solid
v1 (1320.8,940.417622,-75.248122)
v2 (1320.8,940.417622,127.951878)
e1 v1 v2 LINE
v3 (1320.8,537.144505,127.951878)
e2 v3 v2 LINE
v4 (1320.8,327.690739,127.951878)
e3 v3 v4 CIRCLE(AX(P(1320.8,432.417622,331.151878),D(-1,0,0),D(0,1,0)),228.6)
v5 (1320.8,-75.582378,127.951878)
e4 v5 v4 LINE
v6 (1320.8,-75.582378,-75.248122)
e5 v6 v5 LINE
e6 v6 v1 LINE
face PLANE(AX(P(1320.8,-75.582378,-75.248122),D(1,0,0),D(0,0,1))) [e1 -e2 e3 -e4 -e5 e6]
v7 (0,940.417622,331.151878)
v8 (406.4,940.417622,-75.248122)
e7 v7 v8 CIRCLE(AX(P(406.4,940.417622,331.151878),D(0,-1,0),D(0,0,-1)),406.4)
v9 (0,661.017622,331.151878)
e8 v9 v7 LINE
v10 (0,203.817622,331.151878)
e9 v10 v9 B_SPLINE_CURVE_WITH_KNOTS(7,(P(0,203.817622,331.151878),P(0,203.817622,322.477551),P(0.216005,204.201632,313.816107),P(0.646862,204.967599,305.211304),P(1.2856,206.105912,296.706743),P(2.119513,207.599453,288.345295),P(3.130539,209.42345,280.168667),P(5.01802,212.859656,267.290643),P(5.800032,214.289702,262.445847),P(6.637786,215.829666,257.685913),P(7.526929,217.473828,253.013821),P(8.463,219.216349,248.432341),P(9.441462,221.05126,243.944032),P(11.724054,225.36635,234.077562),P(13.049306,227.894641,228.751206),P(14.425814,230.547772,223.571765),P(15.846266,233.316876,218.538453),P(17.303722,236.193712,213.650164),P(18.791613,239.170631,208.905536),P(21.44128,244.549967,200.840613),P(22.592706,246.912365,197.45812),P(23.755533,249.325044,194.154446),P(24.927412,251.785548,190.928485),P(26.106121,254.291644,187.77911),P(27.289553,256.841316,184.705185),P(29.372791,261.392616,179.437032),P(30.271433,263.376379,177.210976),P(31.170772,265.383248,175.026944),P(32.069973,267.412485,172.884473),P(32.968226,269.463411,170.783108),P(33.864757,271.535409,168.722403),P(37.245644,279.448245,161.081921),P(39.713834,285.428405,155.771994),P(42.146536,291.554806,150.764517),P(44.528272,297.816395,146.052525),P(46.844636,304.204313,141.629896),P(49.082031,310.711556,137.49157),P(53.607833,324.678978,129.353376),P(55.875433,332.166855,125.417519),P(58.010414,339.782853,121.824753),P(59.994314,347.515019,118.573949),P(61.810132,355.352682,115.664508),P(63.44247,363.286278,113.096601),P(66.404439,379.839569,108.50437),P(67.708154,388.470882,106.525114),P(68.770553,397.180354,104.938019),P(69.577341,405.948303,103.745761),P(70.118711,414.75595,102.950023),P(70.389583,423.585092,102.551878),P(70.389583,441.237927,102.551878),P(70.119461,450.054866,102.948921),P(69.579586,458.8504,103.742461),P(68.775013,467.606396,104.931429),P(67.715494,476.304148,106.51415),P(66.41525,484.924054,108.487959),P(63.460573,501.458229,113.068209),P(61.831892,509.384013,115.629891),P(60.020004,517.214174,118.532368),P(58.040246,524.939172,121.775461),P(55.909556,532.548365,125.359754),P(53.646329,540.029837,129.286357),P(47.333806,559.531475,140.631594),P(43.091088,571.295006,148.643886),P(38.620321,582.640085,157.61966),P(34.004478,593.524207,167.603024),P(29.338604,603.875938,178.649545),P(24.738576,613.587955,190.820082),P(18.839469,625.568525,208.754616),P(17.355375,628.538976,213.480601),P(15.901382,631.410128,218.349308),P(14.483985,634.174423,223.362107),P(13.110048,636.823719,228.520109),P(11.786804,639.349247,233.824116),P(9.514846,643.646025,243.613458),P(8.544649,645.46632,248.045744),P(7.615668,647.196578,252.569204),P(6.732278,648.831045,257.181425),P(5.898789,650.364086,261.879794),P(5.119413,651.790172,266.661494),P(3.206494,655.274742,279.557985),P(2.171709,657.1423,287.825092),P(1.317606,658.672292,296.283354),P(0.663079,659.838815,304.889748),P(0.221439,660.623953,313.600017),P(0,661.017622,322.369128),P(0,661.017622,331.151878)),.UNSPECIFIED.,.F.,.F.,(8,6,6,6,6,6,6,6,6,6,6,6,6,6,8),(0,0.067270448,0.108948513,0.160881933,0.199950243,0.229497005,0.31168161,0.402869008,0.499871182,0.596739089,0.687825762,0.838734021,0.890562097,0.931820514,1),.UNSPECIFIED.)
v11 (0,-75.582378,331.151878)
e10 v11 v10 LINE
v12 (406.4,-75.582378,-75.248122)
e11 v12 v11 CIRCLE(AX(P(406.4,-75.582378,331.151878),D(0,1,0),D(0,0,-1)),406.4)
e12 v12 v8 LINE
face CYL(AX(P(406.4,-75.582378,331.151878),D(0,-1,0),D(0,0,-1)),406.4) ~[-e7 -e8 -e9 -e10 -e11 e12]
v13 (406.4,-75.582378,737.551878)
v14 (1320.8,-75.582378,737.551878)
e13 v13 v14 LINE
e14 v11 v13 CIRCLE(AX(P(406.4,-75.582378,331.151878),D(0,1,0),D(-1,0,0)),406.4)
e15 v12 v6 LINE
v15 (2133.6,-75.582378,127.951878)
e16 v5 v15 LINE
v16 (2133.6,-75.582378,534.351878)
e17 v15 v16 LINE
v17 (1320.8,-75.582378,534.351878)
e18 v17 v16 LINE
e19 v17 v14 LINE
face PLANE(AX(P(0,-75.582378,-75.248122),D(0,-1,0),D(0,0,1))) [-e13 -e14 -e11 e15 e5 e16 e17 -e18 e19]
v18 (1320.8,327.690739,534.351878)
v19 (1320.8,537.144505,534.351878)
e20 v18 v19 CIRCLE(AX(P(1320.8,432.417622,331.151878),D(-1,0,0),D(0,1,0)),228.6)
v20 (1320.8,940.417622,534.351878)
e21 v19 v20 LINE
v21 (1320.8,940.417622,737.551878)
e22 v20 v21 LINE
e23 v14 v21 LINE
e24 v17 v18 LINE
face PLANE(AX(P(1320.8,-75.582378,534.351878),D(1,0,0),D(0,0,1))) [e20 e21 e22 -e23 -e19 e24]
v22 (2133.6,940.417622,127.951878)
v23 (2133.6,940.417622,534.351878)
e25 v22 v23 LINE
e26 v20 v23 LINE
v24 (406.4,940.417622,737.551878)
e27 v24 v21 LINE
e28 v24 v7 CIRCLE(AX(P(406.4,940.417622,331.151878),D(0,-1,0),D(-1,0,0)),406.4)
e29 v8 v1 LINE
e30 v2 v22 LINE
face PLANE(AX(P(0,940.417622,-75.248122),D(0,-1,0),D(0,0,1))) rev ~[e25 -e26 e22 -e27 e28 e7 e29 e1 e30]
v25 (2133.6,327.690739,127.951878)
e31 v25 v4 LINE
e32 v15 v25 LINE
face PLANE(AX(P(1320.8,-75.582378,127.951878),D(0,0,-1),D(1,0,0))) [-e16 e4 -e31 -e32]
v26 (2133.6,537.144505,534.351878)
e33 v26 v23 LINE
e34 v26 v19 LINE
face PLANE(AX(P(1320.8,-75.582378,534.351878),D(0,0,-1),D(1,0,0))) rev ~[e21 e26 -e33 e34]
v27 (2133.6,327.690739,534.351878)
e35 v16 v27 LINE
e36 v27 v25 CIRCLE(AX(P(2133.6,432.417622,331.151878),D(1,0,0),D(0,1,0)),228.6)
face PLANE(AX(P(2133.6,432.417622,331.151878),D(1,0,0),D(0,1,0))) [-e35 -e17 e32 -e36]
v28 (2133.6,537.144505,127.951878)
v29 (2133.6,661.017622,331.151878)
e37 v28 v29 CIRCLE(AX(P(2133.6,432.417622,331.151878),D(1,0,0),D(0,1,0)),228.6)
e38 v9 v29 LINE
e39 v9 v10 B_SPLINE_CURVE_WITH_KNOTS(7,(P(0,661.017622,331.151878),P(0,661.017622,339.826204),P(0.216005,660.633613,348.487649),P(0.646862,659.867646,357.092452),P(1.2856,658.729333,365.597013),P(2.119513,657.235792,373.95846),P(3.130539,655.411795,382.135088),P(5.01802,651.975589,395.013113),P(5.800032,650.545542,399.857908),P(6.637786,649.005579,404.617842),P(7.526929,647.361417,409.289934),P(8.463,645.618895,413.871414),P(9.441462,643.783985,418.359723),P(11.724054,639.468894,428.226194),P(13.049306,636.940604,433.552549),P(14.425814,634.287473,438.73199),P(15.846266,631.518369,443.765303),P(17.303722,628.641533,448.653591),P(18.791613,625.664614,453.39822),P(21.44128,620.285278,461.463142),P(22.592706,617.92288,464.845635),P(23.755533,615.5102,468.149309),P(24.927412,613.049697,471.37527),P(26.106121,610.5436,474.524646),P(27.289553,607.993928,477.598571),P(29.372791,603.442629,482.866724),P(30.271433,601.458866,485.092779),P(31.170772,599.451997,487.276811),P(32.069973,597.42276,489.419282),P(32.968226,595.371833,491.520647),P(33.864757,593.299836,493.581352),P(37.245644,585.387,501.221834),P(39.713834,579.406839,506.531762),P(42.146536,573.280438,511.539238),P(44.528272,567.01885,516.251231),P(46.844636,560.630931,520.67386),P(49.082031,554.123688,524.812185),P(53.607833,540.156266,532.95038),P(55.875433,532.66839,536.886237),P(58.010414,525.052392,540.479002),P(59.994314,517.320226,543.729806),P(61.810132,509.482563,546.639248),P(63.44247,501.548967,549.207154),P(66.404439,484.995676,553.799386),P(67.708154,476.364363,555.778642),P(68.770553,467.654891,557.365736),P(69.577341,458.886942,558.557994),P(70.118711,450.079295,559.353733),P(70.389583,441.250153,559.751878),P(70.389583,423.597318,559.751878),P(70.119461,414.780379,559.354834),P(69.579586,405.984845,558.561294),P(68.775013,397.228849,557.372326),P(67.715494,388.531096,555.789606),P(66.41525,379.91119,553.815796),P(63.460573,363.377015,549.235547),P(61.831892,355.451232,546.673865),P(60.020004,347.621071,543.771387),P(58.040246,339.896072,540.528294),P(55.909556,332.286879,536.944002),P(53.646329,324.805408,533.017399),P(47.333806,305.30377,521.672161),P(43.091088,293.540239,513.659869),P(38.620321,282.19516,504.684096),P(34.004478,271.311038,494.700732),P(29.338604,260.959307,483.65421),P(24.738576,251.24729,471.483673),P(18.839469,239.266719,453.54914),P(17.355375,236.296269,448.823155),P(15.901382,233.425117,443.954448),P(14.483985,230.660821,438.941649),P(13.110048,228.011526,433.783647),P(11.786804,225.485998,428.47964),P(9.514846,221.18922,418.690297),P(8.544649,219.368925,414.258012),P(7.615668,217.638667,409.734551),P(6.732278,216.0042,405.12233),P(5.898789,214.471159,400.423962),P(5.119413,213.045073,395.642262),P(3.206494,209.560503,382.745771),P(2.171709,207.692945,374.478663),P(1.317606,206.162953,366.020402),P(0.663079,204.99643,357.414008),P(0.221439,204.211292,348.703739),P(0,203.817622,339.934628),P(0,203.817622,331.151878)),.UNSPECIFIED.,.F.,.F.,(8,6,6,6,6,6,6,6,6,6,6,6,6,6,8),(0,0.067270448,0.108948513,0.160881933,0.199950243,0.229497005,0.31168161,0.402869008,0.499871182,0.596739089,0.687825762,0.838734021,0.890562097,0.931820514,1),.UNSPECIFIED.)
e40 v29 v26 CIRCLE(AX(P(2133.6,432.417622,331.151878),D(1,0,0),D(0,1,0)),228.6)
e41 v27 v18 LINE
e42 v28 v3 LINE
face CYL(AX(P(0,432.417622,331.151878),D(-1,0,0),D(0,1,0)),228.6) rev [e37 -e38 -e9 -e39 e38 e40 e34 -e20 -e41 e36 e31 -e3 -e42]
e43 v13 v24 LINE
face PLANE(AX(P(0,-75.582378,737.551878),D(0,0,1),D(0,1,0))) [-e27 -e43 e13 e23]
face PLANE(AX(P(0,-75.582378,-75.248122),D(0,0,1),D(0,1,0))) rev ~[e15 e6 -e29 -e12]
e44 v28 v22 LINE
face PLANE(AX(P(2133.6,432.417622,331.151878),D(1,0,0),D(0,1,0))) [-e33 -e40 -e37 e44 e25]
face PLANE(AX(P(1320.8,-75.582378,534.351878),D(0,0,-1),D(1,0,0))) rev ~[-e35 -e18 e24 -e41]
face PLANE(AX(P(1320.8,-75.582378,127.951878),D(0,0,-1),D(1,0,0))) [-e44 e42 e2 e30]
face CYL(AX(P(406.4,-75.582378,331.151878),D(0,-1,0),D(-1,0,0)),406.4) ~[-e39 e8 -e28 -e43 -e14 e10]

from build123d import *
from build123d import SkipClean  # not in build123d's __all__

# Parameters (mm, degrees)
F0_W     = 1016
F0_H     = 812.8
F0_R     = 228.6
F1_DEPTH = 2133.6
F2_W     = 812.8
F2_H     = 203.2
F3_DEPTH = 1016.001


with BuildPart() as f1:
    # F0 (on Right) → F1 (new body)
    with BuildSketch(Plane.YZ):
        with Locations((432.4176223874, 331.1518777847)):
            Rectangle(F0_W, F0_H)
        with Locations((432.4176223874, 331.1518777847)):
            Circle(F0_R, mode=Mode.SUBTRACT)
    extrude(amount=F1_DEPTH)

    # F2 (on face) → F3 (cut, through all)
    with BuildSketch(Plane.XZ.offset(75.5823776126)):
        with BuildLine():
            Line((0, 737.5518777847), (0, 331.1518777847))
            ThreePointArc((0, 331.1518777847), (119.0318041258, 618.5200736589), (406.4, 737.5518777847))
            Line((406.4, 737.5518777847), (0, 737.5518777847))
        make_face()
        with BuildLine():
            Line((0, 331.1518777847), (0, -75.2481222153))
            Line((0, -75.2481222153), (406.4, -75.2481222153))
            ThreePointArc((406.4, -75.2481222153), (119.0318041258, 43.7836819105), (0, 331.1518777847))
        make_face()
        with Locations((1727.2, 26.3518777847)):
            Rectangle(F2_W, F2_H)
        with Locations((1727.2, 635.9518777847)):
            Rectangle(F2_W, F2_H)
    with SkipClean():  # cleaning this boolean's faces spoils the solid; the shape is the same uncleaned
        extrude(amount=-F3_DEPTH, mode=Mode.SUBTRACT)


solid = f1.part
